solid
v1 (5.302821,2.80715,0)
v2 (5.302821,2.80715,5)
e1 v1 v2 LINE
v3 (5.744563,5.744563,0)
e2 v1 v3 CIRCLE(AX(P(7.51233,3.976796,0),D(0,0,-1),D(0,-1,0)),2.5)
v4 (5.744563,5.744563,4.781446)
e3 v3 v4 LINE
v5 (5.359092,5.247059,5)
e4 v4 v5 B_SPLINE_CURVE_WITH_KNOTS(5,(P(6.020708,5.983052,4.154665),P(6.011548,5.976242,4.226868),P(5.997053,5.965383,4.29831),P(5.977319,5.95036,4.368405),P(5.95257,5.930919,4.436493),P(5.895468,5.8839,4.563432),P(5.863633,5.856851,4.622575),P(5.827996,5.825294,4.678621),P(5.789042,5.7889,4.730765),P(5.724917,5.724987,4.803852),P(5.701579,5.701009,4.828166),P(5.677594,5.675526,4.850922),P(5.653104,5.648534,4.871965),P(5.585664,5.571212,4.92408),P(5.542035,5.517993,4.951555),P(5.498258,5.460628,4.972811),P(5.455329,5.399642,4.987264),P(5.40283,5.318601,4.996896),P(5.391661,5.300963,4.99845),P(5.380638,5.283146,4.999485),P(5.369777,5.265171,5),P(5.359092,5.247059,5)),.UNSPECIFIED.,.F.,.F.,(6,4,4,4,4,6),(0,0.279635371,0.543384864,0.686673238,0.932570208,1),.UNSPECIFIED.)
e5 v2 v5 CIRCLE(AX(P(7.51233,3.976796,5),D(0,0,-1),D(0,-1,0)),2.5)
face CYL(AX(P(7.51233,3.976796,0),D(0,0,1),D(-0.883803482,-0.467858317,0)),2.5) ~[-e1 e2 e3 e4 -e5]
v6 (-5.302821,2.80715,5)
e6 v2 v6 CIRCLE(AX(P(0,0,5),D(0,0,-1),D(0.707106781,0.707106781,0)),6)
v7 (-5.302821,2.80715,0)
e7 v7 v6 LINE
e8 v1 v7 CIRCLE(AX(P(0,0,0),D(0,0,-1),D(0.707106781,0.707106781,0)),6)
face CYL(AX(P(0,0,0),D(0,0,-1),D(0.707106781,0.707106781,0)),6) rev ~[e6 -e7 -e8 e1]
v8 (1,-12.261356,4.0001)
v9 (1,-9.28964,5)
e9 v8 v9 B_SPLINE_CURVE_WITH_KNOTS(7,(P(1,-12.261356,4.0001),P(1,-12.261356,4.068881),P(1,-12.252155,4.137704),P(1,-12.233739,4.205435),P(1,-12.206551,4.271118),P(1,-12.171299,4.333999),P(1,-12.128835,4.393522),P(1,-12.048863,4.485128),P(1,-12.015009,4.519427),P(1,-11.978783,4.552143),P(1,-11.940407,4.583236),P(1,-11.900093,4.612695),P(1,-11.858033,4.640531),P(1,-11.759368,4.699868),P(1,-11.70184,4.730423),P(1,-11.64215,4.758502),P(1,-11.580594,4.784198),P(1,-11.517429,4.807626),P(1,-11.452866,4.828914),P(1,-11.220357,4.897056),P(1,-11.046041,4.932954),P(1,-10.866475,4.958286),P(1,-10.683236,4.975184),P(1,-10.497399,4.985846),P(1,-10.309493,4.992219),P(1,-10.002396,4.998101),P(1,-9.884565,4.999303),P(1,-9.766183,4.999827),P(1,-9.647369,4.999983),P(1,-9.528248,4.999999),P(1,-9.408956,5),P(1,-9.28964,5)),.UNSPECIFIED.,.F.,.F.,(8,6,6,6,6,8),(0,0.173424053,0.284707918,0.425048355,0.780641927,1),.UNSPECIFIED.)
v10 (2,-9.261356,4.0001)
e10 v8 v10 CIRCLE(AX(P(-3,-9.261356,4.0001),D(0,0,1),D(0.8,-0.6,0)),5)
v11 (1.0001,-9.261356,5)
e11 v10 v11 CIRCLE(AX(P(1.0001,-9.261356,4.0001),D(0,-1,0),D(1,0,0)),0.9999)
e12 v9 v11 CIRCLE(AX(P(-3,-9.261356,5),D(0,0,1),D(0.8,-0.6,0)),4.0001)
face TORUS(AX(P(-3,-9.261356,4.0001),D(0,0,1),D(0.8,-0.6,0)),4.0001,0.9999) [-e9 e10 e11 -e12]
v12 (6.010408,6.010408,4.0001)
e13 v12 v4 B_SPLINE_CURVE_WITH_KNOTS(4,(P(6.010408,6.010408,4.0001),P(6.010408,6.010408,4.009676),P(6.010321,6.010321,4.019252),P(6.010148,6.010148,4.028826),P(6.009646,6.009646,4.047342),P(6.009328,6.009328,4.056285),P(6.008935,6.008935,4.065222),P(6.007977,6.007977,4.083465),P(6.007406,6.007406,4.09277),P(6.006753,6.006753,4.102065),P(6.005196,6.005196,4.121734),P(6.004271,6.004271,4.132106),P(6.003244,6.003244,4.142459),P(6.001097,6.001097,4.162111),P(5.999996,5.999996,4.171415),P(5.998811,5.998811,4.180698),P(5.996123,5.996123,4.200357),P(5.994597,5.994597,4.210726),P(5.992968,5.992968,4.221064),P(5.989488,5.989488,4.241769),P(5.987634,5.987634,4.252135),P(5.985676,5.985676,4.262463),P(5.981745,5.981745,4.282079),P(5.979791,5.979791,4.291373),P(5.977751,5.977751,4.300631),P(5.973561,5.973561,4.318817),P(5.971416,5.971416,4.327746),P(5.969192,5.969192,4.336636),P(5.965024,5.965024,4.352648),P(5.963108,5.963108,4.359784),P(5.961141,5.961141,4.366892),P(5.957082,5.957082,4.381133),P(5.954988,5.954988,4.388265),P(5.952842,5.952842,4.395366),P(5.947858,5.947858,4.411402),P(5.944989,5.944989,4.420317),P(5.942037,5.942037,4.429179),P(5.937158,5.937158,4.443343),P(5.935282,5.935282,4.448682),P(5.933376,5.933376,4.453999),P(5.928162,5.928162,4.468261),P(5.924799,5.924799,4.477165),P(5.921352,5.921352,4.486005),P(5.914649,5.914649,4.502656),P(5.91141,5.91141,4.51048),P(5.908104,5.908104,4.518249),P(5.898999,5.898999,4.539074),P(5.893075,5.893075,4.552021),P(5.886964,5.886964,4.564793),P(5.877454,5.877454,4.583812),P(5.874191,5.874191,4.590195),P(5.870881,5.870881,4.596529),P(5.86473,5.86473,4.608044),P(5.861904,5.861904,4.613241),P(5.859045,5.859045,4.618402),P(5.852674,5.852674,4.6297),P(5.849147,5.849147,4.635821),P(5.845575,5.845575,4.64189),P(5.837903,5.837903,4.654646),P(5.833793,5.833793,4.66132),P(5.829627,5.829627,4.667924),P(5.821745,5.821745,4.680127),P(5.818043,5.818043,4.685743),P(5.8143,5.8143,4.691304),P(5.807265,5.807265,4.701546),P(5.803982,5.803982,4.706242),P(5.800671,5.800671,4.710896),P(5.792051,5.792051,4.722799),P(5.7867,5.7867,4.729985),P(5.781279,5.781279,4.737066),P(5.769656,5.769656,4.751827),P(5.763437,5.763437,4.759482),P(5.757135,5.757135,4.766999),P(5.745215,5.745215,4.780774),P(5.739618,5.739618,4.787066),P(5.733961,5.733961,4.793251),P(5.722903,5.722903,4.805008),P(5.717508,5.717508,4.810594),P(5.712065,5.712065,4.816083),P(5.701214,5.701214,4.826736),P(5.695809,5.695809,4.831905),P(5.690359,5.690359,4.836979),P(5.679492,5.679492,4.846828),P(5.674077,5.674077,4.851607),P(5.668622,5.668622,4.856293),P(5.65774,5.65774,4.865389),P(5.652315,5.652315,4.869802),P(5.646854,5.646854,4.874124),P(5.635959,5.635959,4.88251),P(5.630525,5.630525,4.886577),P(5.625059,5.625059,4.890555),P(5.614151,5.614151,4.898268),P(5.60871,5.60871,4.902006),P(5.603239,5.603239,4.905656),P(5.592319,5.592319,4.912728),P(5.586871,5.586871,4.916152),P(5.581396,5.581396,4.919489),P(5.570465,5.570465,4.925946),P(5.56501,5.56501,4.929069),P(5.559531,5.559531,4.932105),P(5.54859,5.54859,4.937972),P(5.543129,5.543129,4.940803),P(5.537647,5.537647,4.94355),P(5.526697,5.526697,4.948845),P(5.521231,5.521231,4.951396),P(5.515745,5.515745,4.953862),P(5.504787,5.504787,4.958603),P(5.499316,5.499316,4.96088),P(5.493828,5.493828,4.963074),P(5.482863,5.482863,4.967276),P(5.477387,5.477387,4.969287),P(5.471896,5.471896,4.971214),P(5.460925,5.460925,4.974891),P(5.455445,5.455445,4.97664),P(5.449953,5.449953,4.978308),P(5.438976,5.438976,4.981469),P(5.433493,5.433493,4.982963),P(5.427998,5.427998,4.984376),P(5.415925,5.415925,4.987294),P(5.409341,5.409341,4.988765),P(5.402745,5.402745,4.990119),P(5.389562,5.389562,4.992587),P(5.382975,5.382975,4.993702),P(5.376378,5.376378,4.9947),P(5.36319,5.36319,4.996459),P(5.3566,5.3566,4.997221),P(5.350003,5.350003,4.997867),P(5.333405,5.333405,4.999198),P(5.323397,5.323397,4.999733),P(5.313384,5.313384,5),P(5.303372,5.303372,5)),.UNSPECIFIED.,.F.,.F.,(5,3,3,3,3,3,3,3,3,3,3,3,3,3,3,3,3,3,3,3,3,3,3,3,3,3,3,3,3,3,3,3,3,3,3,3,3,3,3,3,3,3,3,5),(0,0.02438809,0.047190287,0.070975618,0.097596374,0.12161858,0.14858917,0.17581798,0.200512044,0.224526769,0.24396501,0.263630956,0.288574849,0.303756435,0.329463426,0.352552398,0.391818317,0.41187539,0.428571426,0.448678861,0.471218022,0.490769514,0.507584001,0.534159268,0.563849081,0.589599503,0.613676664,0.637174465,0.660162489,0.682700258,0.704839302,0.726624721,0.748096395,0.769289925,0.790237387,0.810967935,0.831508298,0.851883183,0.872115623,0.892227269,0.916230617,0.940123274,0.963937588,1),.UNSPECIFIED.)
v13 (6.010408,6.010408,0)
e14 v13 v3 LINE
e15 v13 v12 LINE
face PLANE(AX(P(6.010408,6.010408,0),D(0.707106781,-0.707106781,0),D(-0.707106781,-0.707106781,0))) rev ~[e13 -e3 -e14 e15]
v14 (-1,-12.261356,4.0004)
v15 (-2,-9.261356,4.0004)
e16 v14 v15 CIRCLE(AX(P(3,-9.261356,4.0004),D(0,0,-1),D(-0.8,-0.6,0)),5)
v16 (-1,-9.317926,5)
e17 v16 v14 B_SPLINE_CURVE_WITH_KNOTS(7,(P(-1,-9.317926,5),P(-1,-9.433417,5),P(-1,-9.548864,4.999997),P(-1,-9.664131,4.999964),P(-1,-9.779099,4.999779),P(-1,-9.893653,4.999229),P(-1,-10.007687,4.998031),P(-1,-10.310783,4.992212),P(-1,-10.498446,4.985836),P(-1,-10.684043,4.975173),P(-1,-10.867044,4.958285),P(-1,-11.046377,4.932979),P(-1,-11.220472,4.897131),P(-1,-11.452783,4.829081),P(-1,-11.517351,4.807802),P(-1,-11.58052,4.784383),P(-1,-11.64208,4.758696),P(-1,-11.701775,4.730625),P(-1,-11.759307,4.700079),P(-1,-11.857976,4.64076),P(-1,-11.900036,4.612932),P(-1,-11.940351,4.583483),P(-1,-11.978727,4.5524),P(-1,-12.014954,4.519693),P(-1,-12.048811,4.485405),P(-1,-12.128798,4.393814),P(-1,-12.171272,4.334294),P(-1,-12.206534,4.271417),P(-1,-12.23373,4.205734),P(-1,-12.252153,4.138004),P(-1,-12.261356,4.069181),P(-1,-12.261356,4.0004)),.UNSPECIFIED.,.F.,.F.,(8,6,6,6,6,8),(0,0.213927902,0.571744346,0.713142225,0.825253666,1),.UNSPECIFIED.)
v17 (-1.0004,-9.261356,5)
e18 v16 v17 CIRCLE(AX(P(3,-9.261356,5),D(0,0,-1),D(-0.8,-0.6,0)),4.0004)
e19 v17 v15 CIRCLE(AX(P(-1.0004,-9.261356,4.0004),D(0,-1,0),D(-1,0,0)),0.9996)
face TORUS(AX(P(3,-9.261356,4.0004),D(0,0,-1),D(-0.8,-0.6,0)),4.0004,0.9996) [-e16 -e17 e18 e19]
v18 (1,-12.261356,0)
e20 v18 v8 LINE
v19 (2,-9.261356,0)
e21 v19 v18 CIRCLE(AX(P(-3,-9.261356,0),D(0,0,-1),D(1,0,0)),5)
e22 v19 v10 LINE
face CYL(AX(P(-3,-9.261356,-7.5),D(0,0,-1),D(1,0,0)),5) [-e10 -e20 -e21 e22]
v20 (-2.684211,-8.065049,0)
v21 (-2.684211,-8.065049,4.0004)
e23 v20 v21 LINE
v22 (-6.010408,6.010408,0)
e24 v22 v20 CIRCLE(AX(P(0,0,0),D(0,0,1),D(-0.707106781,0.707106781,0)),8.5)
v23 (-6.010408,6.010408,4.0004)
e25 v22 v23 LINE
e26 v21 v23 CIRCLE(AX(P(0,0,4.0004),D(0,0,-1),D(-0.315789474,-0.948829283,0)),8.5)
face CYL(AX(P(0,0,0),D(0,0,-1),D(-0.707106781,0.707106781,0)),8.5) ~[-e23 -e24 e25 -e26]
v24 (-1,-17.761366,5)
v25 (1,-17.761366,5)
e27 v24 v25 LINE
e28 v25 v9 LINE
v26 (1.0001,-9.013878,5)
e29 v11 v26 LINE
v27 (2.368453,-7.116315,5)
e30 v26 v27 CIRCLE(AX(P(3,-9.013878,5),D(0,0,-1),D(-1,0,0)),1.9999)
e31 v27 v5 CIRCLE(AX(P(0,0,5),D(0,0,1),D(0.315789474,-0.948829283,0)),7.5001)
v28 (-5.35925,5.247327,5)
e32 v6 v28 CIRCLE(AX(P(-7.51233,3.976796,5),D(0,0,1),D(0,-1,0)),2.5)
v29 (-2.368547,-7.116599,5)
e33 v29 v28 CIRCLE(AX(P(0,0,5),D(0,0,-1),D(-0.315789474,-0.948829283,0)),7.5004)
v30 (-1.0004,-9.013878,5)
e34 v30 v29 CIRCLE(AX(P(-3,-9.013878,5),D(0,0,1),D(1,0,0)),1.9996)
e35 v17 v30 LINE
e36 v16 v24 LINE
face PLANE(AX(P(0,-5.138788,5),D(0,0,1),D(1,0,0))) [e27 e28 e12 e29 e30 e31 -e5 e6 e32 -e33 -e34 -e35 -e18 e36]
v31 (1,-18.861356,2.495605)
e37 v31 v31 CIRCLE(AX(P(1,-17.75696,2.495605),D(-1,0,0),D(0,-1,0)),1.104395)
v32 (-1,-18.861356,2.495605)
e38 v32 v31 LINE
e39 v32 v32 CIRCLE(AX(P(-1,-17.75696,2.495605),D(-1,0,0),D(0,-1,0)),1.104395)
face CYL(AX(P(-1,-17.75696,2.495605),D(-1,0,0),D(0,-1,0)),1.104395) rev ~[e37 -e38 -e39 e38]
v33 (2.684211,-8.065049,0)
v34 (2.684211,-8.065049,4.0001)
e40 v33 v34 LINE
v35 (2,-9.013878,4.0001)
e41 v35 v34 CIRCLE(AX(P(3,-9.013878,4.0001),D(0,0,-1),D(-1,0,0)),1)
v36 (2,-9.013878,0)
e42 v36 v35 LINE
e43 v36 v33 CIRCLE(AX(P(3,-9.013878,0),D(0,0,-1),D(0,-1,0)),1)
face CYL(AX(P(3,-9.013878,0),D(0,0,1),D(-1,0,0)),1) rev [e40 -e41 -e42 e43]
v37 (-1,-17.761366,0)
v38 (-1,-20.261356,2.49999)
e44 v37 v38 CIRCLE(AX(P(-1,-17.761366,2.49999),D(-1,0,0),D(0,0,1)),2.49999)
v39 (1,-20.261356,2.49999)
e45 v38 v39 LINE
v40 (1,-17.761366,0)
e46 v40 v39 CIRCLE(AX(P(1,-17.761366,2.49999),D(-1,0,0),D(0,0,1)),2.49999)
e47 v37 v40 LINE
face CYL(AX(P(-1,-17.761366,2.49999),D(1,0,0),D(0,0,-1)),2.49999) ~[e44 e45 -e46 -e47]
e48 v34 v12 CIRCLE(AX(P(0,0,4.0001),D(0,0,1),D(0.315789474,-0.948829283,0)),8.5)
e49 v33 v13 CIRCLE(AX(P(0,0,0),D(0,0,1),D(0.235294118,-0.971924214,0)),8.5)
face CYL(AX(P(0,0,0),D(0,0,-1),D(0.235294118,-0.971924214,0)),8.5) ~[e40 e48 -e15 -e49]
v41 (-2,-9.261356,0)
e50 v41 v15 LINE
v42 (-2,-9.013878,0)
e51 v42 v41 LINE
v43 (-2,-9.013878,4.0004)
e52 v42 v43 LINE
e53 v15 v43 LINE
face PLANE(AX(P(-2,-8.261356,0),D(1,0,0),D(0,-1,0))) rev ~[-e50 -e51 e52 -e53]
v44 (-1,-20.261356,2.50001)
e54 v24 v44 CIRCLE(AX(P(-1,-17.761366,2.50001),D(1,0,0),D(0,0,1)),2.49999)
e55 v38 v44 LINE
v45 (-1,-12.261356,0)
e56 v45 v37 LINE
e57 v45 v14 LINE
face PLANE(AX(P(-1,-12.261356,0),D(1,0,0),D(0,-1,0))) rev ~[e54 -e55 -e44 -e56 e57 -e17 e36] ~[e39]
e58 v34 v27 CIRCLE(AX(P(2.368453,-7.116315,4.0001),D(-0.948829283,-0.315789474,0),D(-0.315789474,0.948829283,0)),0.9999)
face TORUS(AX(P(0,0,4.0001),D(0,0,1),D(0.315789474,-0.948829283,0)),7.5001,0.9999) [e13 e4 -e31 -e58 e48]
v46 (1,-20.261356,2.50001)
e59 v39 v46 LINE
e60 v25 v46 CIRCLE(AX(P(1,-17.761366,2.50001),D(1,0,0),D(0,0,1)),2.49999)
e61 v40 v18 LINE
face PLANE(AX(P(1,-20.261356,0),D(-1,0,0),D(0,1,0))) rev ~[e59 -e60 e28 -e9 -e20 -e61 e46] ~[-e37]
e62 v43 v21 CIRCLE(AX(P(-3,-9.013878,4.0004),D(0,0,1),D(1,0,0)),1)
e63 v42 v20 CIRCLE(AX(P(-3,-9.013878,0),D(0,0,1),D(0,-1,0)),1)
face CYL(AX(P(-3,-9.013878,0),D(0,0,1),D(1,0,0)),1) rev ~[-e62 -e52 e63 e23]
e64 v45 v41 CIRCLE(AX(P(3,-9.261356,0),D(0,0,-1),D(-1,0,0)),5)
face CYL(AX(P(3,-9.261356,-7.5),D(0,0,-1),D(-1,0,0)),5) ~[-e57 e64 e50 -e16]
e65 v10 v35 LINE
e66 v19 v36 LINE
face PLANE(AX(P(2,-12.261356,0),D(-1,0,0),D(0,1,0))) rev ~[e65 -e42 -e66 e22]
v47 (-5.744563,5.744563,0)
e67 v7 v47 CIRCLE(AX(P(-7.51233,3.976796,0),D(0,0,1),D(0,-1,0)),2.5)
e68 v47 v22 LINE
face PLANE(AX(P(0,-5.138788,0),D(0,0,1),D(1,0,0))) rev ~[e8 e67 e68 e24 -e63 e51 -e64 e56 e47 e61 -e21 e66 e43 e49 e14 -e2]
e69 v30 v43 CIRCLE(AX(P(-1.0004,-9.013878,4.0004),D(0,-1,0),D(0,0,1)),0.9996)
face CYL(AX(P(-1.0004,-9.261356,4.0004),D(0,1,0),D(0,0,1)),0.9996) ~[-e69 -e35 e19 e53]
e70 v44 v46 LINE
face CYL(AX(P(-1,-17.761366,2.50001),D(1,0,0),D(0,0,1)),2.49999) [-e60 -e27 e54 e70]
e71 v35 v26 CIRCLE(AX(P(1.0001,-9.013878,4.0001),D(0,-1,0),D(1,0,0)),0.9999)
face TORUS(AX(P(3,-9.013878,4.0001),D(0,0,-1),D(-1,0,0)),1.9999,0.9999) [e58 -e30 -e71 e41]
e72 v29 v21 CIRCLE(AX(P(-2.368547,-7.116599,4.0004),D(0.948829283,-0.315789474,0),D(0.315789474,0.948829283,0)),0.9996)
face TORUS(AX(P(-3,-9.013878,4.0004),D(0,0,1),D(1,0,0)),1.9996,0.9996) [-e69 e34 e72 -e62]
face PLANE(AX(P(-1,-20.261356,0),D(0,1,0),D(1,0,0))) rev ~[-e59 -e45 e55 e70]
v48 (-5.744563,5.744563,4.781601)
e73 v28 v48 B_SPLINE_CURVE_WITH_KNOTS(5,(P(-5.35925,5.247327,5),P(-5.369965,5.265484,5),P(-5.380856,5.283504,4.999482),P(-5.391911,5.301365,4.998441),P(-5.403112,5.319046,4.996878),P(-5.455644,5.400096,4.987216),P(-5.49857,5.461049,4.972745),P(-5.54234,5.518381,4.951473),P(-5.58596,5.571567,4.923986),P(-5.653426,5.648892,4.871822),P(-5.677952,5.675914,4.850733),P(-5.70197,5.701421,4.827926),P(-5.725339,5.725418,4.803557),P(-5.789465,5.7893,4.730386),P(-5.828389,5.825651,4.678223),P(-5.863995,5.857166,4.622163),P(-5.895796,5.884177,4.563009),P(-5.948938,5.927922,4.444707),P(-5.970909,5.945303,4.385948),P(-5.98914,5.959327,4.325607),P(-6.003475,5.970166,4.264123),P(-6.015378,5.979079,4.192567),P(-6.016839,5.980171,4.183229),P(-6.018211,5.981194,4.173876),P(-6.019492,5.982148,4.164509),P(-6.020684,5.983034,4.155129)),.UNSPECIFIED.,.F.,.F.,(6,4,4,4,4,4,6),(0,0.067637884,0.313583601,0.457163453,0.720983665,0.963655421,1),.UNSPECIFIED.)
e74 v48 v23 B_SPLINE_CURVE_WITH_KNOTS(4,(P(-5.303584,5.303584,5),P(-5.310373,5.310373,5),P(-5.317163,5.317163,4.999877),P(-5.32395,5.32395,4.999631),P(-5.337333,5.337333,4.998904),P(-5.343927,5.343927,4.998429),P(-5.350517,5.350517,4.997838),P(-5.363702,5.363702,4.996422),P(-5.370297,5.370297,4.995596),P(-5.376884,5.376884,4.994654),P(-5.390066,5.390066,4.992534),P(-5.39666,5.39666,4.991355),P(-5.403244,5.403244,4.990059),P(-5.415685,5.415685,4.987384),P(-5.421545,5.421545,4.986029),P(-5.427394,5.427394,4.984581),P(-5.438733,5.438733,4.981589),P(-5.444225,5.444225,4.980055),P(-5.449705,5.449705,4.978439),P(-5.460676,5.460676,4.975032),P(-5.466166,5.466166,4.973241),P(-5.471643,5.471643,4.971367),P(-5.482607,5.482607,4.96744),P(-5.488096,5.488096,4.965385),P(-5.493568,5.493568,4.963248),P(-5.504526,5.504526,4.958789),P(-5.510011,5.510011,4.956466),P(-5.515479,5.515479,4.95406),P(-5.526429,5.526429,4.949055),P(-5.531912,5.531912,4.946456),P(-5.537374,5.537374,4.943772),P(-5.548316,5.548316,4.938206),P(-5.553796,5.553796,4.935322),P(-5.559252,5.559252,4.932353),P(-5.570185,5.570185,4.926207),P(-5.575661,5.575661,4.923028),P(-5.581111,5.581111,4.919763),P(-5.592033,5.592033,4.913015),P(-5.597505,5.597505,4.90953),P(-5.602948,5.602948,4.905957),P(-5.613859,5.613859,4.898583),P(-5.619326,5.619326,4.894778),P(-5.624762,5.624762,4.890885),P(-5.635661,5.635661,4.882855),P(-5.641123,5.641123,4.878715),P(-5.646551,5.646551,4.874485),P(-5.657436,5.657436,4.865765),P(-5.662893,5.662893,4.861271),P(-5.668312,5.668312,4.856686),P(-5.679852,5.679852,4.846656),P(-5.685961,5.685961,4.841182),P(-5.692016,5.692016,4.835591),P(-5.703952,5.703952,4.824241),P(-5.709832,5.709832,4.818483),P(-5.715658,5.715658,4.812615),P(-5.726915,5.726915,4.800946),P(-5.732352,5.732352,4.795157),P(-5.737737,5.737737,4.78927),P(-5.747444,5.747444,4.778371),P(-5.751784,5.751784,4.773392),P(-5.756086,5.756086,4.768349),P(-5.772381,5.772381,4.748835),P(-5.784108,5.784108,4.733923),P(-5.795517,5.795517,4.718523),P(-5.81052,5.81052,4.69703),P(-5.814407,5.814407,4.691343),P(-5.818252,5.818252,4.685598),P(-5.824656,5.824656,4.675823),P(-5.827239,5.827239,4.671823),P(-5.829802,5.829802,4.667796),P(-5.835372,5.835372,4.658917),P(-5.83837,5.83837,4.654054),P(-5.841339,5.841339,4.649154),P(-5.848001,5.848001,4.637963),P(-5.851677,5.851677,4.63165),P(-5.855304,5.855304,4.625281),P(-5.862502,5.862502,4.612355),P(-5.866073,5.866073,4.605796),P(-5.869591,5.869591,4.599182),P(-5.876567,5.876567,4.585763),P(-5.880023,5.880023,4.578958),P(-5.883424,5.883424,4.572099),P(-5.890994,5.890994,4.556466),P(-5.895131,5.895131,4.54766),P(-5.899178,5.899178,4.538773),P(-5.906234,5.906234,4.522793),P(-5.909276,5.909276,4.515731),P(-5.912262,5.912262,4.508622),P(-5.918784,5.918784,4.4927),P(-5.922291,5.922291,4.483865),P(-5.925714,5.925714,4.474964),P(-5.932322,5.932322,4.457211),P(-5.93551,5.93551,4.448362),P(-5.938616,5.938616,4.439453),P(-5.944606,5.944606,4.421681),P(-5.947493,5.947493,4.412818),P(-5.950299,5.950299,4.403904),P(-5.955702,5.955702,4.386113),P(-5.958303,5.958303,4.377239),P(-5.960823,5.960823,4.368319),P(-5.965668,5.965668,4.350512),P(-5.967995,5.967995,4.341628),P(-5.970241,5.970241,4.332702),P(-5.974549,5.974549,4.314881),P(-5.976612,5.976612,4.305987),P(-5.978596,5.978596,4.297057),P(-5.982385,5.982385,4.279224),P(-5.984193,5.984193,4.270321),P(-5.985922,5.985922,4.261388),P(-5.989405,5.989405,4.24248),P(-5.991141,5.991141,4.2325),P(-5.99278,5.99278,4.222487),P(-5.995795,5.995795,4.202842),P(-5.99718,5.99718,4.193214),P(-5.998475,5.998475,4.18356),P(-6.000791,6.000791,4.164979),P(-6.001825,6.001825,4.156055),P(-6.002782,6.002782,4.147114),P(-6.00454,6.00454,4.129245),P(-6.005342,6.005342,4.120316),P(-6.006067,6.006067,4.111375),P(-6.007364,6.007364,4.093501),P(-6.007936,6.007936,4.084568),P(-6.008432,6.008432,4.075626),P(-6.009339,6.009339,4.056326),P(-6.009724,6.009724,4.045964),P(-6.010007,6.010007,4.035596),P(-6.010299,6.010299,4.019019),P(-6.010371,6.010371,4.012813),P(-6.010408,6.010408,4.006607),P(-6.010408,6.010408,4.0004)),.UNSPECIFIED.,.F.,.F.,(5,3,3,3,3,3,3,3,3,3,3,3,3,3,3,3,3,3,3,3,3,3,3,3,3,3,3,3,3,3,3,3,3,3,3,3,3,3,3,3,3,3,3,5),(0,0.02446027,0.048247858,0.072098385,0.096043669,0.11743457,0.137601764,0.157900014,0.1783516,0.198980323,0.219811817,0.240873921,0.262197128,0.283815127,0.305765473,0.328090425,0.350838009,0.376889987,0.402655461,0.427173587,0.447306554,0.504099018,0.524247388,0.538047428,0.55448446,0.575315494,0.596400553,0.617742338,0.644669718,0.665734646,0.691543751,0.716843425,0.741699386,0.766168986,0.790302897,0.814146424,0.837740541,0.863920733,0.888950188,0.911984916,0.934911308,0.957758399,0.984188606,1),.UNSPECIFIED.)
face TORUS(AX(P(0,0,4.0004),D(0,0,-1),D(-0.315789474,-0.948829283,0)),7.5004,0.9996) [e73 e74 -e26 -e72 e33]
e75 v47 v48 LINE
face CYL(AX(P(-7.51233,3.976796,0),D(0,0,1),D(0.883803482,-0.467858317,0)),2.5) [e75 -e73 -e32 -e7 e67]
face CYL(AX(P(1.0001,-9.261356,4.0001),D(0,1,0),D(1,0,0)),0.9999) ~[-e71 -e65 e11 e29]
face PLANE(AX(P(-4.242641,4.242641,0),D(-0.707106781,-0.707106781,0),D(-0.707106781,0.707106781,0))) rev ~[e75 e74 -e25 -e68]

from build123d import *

# Parameters (mm, degrees)
F1_DEPTH    = 5
F2_R        = 1.1043953889
F3_DEPTH    = 5
F4_R        = 2.5
F5_T1_DEPTH = 20
F6_F1_R     = 1
F6_F2_R     = 1
F6_F3_R     = 0.9999
F6_F4_R     = 0.9996
F7_R        = 2.49999


# Not quite as in the source:
# - a fillet or chamfer that OpenCascade refuses, or shapes differently, is made with other operations: its cross-section is extruded or revolved along the edge and cut away or added
# - a fillet or chamfer is up to 0.001 mm smaller than in the source, because OpenCascade refuses the exact size


with BuildPart() as f1:
    # F0 (on Top) → F1 (new body)
    with BuildSketch(Plane.XY):
        with BuildLine():
            ThreePointArc((4.2426406871, 4.2426406871), (0, -6), (-4.2426406871, 4.2426406871))
            Line((-4.2426406871, 4.2426406871), (-6.0104076401, 6.0104076401))
            ThreePointArc((-6.0104076401, 6.0104076401), (-8.1830596791, -2.2994639132), (-2, -8.2613558209))
            Line((-2, -8.2613558209), (-2, -12.2613558209))
            Line((-2, -12.2613558209), (-1, -12.2613558209))
            Line((-1, -12.2613558209), (-1, -20.2613558209))
            Line((-1, -20.2613558209), (0, -20.2613558209))
            Line((0, -20.2613558209), (1, -20.2613558209))
            Line((1, -20.2613558209), (1, -12.2613558209))
            Line((1, -12.2613558209), (2, -12.2613558209))
            Line((2, -12.2613558209), (2, -8.2613558209))
            ThreePointArc((2, -8.2613558209), (8.1830596791, -2.2994639132), (6.0104076401, 6.0104076401))
            Line((6.0104076401, 6.0104076401), (4.2426406871, 4.2426406871))
        make_face()
    extrude(amount=F1_DEPTH)

    # F2 (on face) → F3 (cut)
    with BuildSketch(Plane(origin=(-1, 0, 0), x_dir=(0, -1, 0), z_dir=(-1, 0, 0))):
        with Locations((17.756960432, 2.4956046111)):
            Circle(F2_R)
    extrude(amount=-F3_DEPTH, mode=Mode.SUBTRACT)

    # F4
    f4_edges = [f1.edges().sort_by_distance(p)[0] for p in [
        (4.242641, 4.242641, 2.5),
        (-4.242641, 4.242641, 2.5),
    ]]
    fillet(f4_edges, radius=F4_R)

    # F5: fillet of radius 5 on 2 edges, made by hand

    # F5_s2 → F5_t1 (cut)
    with BuildSketch(Plane.XY.offset(-7.5)):
        with BuildLine():
            ThreePointArc((2, -9.2613558209), (1.7434164903, -10.842494651), (1, -12.2613558209))
            Line((1, -12.2613558209), (2, -12.2613558209))
            Line((2, -12.2613558209), (2, -9.2613558209))
        make_face()
        with BuildLine():
            ThreePointArc((-2, -9.2613558209), (-1.7434164903, -10.842494651), (-1, -12.2613558209))
            Line((-1, -12.2613558209), (-2, -12.2613558209))
            Line((-2, -12.2613558209), (-2, -9.2613558209))
        make_face()
    extrude(amount=F5_T1_DEPTH, mode=Mode.SUBTRACT)

    # F6: fillet of radius 1 on 6 edges, made by hand

    # F6_f1
    f6_f1_edges = [f1.edges().sort_by_distance(p)[0] for p in [
        (-2, -8.2613558209, 2.5),
    ]]
    fillet(f6_f1_edges, radius=F6_F1_R)

    # F6_f2
    f6_f2_edges = [f1.edges().sort_by_distance(p)[0] for p in [
        (2, -8.2613558209, 2.5),
    ]]
    fillet(f6_f2_edges, radius=F6_F2_R)

    # F6_f3 (radius 1 in the source; OpenCascade refuses exactly that, so slightly less here)
    f6_f3_edges = [f1.edges().sort_by_distance(p)[0] for p in [
        (2, -9.1376170048, 5),
        (1.7434164903, -10.842494651, 5),
    ]]
    fillet(f6_f3_edges, radius=F6_F3_R)

    # F6_f4 (radius 1 in the source; OpenCascade refuses exactly that, so slightly less here)
    f6_f4_edges = [f1.edges().sort_by_distance(p)[0] for p in [
        (-1.7434164903, -10.842494651, 5),
        (-2, -9.1376170048, 5),
    ]]
    fillet(f6_f4_edges, radius=F6_F4_R)

    # F7 (radius 2.5 in the source; OpenCascade refuses exactly that, so slightly less here)
    f7_edges = [f1.edges().sort_by_distance(p)[0] for p in [
        (0, -20.261356, 5),
        (0, -20.261356, 0),
    ]]
    fillet(f7_edges, radius=F7_R)


solid = f1.part
